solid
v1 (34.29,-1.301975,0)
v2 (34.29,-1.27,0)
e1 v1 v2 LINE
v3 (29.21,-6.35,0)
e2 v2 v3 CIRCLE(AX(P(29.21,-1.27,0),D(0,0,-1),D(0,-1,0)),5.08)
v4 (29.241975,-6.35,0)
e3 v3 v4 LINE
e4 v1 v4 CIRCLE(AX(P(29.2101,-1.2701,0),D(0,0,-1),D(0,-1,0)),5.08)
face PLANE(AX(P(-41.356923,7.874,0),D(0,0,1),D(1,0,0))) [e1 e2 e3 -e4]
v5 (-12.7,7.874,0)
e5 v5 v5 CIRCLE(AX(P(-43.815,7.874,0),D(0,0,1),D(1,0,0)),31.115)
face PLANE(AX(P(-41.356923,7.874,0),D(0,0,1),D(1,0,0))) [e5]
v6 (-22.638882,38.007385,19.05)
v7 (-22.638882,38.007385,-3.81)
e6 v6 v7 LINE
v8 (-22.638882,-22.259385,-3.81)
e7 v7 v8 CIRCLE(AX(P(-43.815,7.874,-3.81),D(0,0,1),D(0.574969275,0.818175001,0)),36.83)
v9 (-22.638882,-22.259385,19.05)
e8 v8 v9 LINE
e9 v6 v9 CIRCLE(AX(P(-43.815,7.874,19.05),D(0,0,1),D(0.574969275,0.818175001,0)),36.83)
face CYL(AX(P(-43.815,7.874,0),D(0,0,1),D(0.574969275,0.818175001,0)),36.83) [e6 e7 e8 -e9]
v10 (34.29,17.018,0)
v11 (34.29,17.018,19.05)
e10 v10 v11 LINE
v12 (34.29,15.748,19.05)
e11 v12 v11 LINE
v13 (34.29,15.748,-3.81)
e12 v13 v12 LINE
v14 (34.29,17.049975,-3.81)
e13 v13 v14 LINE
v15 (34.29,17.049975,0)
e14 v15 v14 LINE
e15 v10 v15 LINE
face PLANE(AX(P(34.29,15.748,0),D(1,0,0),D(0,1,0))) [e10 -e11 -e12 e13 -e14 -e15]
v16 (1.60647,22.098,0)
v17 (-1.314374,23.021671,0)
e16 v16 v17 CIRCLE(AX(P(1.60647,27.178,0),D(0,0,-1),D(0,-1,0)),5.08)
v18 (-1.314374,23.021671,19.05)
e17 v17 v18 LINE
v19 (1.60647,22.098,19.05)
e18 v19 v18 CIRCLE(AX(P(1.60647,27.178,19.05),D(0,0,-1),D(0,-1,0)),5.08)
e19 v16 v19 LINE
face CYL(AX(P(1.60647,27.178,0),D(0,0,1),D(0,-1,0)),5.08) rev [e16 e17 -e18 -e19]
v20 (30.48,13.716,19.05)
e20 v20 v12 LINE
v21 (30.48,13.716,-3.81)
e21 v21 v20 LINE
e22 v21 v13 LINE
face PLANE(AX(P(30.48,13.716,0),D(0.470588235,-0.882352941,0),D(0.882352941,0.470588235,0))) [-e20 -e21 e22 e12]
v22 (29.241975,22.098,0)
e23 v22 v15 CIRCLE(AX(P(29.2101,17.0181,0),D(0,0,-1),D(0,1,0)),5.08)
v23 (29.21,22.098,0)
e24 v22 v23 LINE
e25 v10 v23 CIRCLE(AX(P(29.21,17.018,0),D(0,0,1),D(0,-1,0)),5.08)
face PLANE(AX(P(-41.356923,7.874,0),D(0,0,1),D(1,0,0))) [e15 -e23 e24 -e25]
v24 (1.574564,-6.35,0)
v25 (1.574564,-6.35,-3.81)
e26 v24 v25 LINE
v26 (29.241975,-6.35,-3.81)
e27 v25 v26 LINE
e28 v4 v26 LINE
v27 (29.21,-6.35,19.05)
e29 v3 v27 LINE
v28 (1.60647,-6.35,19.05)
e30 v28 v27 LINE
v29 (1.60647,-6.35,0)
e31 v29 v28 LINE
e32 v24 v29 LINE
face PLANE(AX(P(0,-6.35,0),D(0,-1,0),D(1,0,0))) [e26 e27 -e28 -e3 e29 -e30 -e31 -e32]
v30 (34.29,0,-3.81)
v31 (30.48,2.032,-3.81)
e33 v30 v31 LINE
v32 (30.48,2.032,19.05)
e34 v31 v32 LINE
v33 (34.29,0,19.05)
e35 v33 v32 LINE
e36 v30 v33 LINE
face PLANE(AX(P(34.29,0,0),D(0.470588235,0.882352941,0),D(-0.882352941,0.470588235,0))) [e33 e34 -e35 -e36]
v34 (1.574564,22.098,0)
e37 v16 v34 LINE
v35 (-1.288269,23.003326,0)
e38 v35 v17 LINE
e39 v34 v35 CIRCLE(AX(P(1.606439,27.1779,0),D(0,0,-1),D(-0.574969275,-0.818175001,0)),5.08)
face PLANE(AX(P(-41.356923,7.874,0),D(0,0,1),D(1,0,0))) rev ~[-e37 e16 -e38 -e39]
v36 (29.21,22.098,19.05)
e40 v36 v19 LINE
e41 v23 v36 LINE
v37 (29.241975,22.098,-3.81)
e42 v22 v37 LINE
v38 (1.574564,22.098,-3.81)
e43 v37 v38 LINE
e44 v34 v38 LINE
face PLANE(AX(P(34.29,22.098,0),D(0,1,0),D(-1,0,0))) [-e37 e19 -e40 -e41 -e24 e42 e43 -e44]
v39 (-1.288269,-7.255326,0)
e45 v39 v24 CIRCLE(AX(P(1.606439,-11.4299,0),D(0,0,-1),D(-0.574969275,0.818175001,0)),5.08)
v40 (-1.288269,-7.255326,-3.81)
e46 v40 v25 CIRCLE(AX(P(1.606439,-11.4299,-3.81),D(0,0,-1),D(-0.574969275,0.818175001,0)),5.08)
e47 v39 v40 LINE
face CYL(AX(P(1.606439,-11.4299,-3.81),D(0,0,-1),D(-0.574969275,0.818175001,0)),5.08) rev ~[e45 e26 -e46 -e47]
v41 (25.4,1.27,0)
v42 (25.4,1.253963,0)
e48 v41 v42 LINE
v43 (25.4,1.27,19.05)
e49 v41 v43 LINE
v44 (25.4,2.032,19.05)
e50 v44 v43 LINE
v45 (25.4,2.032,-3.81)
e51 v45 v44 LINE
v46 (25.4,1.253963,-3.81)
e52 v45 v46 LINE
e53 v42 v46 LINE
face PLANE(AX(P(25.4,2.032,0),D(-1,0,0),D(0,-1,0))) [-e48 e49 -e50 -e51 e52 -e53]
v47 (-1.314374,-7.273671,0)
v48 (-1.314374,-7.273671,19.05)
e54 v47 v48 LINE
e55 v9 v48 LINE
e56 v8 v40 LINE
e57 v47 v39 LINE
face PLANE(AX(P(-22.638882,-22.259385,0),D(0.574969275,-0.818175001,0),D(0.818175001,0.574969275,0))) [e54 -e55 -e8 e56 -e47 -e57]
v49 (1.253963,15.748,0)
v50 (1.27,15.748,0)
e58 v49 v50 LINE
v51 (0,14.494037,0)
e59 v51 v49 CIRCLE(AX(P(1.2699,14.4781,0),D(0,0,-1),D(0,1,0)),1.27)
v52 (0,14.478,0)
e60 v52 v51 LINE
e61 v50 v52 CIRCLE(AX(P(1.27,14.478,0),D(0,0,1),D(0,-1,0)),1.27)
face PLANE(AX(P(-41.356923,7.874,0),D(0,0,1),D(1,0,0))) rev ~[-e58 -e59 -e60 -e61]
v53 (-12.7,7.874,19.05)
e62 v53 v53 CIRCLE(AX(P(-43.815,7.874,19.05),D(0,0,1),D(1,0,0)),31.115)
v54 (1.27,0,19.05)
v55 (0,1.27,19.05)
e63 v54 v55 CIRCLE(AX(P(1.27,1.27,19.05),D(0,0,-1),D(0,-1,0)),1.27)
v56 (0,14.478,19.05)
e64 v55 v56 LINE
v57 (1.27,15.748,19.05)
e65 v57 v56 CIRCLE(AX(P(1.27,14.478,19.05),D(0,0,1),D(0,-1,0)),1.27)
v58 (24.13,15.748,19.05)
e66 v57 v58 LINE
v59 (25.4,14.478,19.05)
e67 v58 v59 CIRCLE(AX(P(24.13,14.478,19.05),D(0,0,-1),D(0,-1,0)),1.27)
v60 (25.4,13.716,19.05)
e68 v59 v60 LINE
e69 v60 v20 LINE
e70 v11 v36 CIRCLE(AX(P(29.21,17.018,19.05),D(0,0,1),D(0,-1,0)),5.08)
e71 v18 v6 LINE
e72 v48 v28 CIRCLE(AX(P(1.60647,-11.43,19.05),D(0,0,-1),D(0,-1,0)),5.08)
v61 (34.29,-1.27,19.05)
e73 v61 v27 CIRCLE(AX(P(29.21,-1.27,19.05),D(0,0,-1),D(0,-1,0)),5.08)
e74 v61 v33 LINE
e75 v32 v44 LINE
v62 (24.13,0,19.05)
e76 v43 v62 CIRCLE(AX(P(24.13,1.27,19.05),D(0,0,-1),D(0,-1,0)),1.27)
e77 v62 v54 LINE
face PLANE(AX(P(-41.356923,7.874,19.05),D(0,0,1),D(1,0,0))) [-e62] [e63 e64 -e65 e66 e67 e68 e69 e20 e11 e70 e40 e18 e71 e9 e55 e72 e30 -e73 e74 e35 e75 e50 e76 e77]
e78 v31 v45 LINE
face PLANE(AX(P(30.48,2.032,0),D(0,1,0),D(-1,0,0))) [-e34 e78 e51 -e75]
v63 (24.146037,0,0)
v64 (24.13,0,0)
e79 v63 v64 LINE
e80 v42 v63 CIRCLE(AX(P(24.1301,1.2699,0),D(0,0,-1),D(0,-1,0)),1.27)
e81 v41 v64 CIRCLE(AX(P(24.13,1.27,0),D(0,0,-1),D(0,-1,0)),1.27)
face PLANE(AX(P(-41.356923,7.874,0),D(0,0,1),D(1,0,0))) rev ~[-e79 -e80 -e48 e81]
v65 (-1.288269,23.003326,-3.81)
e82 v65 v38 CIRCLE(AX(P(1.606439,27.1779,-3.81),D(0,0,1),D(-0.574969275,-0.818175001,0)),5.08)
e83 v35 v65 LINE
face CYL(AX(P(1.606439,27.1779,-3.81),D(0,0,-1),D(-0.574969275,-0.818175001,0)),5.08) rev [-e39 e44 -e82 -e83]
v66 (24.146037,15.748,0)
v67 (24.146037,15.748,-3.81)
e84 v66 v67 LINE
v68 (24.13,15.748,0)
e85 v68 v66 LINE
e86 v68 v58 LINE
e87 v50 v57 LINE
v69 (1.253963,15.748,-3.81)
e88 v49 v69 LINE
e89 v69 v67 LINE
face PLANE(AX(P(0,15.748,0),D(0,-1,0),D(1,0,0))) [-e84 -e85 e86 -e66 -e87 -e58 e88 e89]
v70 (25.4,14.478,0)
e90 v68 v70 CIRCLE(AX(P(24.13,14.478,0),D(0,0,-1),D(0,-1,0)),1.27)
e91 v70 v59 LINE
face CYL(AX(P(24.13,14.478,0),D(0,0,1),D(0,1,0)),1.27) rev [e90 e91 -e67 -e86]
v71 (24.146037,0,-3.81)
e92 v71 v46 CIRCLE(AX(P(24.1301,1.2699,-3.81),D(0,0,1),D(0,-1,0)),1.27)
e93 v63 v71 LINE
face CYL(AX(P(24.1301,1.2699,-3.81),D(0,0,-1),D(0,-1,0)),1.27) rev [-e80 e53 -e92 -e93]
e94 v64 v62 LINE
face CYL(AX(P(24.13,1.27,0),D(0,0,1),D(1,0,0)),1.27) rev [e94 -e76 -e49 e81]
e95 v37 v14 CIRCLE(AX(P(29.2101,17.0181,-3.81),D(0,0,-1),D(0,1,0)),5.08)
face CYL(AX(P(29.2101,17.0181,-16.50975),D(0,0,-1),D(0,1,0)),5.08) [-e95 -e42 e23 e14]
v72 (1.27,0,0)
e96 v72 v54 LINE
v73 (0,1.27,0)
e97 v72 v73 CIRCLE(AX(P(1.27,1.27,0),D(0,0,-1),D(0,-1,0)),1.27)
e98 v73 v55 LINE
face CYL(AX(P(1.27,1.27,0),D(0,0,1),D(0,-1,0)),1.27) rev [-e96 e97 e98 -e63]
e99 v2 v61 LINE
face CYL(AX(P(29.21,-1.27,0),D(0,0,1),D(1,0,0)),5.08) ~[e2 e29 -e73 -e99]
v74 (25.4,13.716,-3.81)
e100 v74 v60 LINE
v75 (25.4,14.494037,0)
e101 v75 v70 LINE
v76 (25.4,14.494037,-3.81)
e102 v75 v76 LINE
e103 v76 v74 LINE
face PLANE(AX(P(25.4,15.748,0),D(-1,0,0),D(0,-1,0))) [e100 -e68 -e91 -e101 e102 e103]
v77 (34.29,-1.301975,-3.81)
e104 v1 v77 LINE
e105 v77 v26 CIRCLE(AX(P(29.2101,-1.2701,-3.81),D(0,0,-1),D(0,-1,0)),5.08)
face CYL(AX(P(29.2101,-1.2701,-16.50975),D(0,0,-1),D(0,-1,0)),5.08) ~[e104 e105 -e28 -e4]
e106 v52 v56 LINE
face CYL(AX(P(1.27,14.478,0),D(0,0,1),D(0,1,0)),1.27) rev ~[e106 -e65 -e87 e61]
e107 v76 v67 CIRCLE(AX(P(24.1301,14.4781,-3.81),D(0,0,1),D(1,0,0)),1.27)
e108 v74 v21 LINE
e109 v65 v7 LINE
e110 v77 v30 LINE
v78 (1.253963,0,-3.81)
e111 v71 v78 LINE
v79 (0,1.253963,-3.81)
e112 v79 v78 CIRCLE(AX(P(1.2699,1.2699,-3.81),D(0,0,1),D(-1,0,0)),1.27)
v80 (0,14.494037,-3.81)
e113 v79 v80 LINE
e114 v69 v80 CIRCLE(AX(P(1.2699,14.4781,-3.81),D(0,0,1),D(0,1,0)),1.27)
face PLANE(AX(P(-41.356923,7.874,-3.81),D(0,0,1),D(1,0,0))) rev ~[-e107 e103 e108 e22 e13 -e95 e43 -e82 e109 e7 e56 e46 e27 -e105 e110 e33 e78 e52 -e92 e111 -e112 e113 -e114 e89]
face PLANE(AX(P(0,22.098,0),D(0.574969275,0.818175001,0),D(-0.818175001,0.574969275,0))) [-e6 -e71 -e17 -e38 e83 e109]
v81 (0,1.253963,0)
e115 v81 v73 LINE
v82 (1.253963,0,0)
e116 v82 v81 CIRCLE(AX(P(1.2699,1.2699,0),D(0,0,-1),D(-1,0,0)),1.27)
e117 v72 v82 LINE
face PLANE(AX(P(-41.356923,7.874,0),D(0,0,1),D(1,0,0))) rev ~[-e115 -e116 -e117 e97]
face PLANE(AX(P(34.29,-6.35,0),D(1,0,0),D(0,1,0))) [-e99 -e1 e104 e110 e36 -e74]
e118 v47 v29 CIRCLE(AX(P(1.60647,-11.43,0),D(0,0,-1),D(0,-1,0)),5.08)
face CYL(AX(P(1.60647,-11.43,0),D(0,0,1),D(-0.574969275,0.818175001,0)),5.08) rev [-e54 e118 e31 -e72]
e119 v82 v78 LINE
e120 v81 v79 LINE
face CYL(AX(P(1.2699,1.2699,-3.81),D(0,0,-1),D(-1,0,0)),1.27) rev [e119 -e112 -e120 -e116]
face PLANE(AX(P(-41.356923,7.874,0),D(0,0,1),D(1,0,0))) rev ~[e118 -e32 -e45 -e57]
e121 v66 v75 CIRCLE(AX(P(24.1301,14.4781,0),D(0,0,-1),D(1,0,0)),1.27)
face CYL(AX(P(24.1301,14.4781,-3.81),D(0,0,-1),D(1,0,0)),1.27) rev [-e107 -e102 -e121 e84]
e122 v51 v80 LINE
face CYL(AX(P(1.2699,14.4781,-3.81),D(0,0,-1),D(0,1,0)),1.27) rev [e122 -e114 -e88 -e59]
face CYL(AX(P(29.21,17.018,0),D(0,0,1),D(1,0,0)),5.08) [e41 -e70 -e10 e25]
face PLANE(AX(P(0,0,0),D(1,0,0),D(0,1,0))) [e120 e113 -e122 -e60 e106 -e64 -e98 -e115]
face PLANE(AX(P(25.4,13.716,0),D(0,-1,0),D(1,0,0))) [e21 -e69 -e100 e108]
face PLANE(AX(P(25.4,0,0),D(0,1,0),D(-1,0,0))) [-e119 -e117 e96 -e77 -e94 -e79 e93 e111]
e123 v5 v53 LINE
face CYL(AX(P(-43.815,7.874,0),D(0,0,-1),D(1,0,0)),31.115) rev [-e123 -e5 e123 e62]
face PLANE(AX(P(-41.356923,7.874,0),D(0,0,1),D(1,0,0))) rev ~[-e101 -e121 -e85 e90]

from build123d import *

# Parameters (mm, degrees)
F0_R        = 31.115
F1_DEPTH    = 19.05
F2_R        = 1.27
F3_R        = 5.08
F4_DEPTH    = 3.81
F5_T1_DEPTH = 6.9847500098
F6_T1_DEPTH = 7.826096392
F6_T3_DEPTH = 29.2095000049


# Not quite as in the source:
# - a fillet or chamfer that OpenCascade refuses, or shapes differently, is made with other operations: its cross-section is extruded or revolved along the edge and cut away or added


with BuildPart() as f1:
    # F0 (on Top) → F1 (new body)
    with BuildSketch(Plane.XY):
        with BuildLine():
            ThreePointArc((-22.6388816051, -22.2593853014), (-11.1319360334, -9.104404806), (-6.985, 7.874))
            ThreePointArc((-6.985, 7.874), (-11.1319360334, 24.852404806), (-22.6388816051, 38.0073853014))
            ThreePointArc((-22.6388816051, 38.0073853014), (-80.645, 7.874), (-22.6388816051, -22.2593853014))
        make_face()
        with Locations((-43.815, 7.874)):
            Circle(F0_R, mode=Mode.SUBTRACT)
        with BuildLine():
            Line((-6.985, 7.874), (0, 7.874))
            Line((0, 7.874), (0, 15.748))
            Line((0, 15.748), (25.4, 15.748))
            Line((25.4, 15.748), (34.29, 15.748))
            Line((34.29, 15.748), (34.29, 22.098))
            Line((34.29, 22.098), (0, 22.098))
            Line((0, 22.098), (-22.6388816051, 38.0073853014))
            ThreePointArc((-22.6388816051, 38.0073853014), (-11.1319360334, 24.852404806), (-6.985, 7.874))
        make_face()
        with BuildLine():
            Line((25.4, 0), (0, 0))
            Line((0, 0), (0, 7.874))
            Line((0, 7.874), (-6.985, 7.874))
            ThreePointArc((-6.985, 7.874), (-11.1319360334, -9.104404806), (-22.6388816051, -22.2593853014))
            Line((-22.6388816051, -22.2593853014), (0, -6.35))
            Line((0, -6.35), (34.29, -6.35))
            Line((34.29, -6.35), (34.29, 0))
            Line((34.29, 0), (25.4, 0))
        make_face()
        Polygon((25.4, 2.032), (25.4, 0), (34.29, 0), (30.48, 2.032), align=None)
        Polygon((34.29, 15.748), (25.4, 15.748), (25.4, 13.716), (30.48, 13.716), align=None)
    extrude(amount=F1_DEPTH)

    # F2
    f2_edges = [f1.edges().sort_by_distance(p)[0] for p in [
        (0, 15.748, 9.525),
        (25.4, 15.748, 9.525),
        (0, 0, 9.525),
        (25.4, 0, 9.525),
    ]]
    fillet(f2_edges, radius=F2_R)

    # F3
    f3_edges = [f1.edges().sort_by_distance(p)[0] for p in [
        (34.29, -6.35, 9.525),
        (34.29, 22.098, 9.525),
        (0, -6.35, 9.525),
        (0, 22.098, 9.525),
    ]]
    fillet(f3_edges, radius=F3_R)

    # F0 (on Top) → F4 (join)
    with BuildSketch(Plane.XY):
        with BuildLine():
            ThreePointArc((-22.6388816051, -22.2593853014), (-11.1319360334, -9.104404806), (-6.985, 7.874))
            ThreePointArc((-6.985, 7.874), (-11.1319360334, 24.852404806), (-22.6388816051, 38.0073853014))
            ThreePointArc((-22.6388816051, 38.0073853014), (-80.645, 7.874), (-22.6388816051, -22.2593853014))
        make_face()
        with Locations((-43.815, 7.874)):
            Circle(F0_R, mode=Mode.SUBTRACT)
        with Locations((-43.815, 7.874)):
            Circle(F0_R)
        with BuildLine():
            Line((25.4, 0), (0, 0))
            Line((0, 0), (0, 7.874))
            Line((0, 7.874), (-6.985, 7.874))
            ThreePointArc((-6.985, 7.874), (-11.1319360334, -9.104404806), (-22.6388816051, -22.2593853014))
            Line((-22.6388816051, -22.2593853014), (0, -6.35))
            Line((0, -6.35), (34.29, -6.35))
            Line((34.29, -6.35), (34.29, 0))
            Line((34.29, 0), (25.4, 0))
        make_face()
        with BuildLine():
            Line((-6.985, 7.874), (0, 7.874))
            Line((0, 7.874), (0, 15.748))
            Line((0, 15.748), (25.4, 15.748))
            Line((25.4, 15.748), (34.29, 15.748))
            Line((34.29, 15.748), (34.29, 22.098))
            Line((34.29, 22.098), (0, 22.098))
            Line((0, 22.098), (-22.6388816051, 38.0073853014))
            ThreePointArc((-22.6388816051, 38.0073853014), (-11.1319360334, 24.852404806), (-6.985, 7.874))
        make_face()
        Polygon((34.29, 15.748), (25.4, 15.748), (25.4, 13.716), (30.48, 13.716), align=None)
        Polygon((25.4, 2.032), (25.4, 0), (34.29, 0), (30.48, 2.032), align=None)
    extrude(amount=-F4_DEPTH)

    # F5: fillet of radius 1.27 on 4 edges, made by hand

    # F5_s2 → F5_t1 (join)
    with BuildSketch(Plane.XY.offset(-3.81)):
        with BuildLine():
            ThreePointArc((24.1301, -0.0001), (25.0281256121, 0.3718743879), (25.4001, 1.2699))
            Line((25.4001, 1.2699), (25.4255, 1.2699))
            ThreePointArc((25.4255, 1.2699), (25.4254, 0.63495), (25.4254, 0))
            Line((25.4254, 0), (25.4, -0.0254))
            ThreePointArc((25.4, -0.0254), (24.76505, -0.0254), (24.1301, -0.0255))
            Line((24.1301, -0.0255), (24.1301, -0.0001))
        make_face()
        with BuildLine():
            ThreePointArc((25.4001, 14.4781), (25.0281256121, 15.3761256121), (24.1301, 15.7481))
            Line((24.1301, 15.7481), (24.1301, 15.7735))
            ThreePointArc((24.1301, 15.7735), (24.76505, 15.7734), (25.4, 15.7734))
            Line((25.4, 15.7734), (25.4254, 15.748))
            ThreePointArc((25.4254, 15.748), (25.4254, 15.11305), (25.4255, 14.4781))
            Line((25.4255, 14.4781), (25.4001, 14.4781))
        make_face()
        with BuildLine():
            ThreePointArc((1.2699, 15.7481), (0.3718743879, 15.3761256121), (-0.0001, 14.4781))
            Line((-0.0001, 14.4781), (-0.0255, 14.4781))
            ThreePointArc((-0.0255, 14.4781), (-0.0254, 15.11305), (-0.0254, 15.748))
            Line((-0.0254, 15.748), (0, 15.7734))
            ThreePointArc((0, 15.7734), (0.63495, 15.7734), (1.2699, 15.7735))
            Line((1.2699, 15.7735), (1.2699, 15.7481))
        make_face()
        with BuildLine():
            ThreePointArc((-0.0001, 1.2699), (0.3718743879, 0.3718743879), (1.2699, -0.0001))
            Line((1.2699, -0.0001), (1.2699, -0.0255))
            ThreePointArc((1.2699, -0.0255), (0.63495, -0.0254), (0, -0.0254))
            Line((0, -0.0254), (-0.0254, 0))
            ThreePointArc((-0.0254, 0), (-0.0254, 0.63495), (-0.0255, 1.2699))
            Line((-0.0255, 1.2699), (-0.0001, 1.2699))
        make_face()
    extrude(amount=F5_T1_DEPTH)

    # F6: fillet of radius 5.08 on 4 edges, made by hand

    # F6_s2 → F6_t1 (join)
    with BuildSketch(Plane.XY.offset(-3.81)):
        with BuildLine():
            ThreePointArc((-1.3144053628, -7.2735709929), (0.0747322104, -6.5863191265), (1.6064385537, -6.3499))
            Line((1.6064385537, -6.3499), (1.6064385537, -6.2483))
            ThreePointArc((1.6064385537, -6.2483), (0.8032192768, -6.2484), (0, -6.2484))
            Line((0, -6.2484), (-0.0584168783, -6.2668734199))
            ThreePointArc((-0.0584168783, -6.2668734199), (-0.7155908113, -6.7286998251), (-1.3728222412, -7.1904444128))
            Line((-1.3728222412, -7.1904444128), (-1.3144053628, -7.2735709929))
        make_face()
        with BuildLine():
            ThreePointArc((-1.3144053628, 23.0215709929), (0.0747322104, 22.3343191265), (1.6064385537, 22.0979))
            Line((1.6064385537, 22.0979), (1.6064385537, 21.9963))
            ThreePointArc((1.6064385537, 21.9963), (0.8032192768, 21.9964), (0, 21.9964))
            Line((0, 21.9964), (-0.0584168783, 22.0148734199))
            ThreePointArc((-0.0584168783, 22.0148734199), (-0.7155908113, 22.4766998251), (-1.3728222412, 22.9384444128))
            Line((-1.3728222412, 22.9384444128), (-1.3144053628, 23.0215709929))
        make_face()
    extrude(amount=F6_T1_DEPTH)

    # F6_s4 → F6_t3 (cut)
    with BuildSketch(Plane.XY.offset(-16.5097500025)):
        with BuildLine():
            ThreePointArc((29.2101, -6.3501), (32.8022024484, -4.8622024484), (34.2901, -1.2701))
            Line((34.2901, -1.2701), (34.3917, -1.2701))
            ThreePointArc((34.3917, -1.2701), (34.3916, -3.81005), (34.3916, -6.35))
            Line((34.3916, -6.35), (34.29, -6.4516))
            ThreePointArc((34.29, -6.4516), (31.75005, -6.4516), (29.2101, -6.4517))
            Line((29.2101, -6.4517), (29.2101, -6.3501))
        make_face()
        with BuildLine():
            ThreePointArc((29.2101, 22.0981), (32.8022024484, 20.6102024484), (34.2901, 17.0181))
            Line((34.2901, 17.0181), (34.3917, 17.0181))
            ThreePointArc((34.3917, 17.0181), (34.3916, 19.55805), (34.3916, 22.098))
            Line((34.3916, 22.098), (34.29, 22.1996))
            ThreePointArc((34.29, 22.1996), (31.75005, 22.1996), (29.2101, 22.1997))
            Line((29.2101, 22.1997), (29.2101, 22.0981))
        make_face()
    extrude(amount=F6_T3_DEPTH, mode=Mode.SUBTRACT)


solid = f1.part
